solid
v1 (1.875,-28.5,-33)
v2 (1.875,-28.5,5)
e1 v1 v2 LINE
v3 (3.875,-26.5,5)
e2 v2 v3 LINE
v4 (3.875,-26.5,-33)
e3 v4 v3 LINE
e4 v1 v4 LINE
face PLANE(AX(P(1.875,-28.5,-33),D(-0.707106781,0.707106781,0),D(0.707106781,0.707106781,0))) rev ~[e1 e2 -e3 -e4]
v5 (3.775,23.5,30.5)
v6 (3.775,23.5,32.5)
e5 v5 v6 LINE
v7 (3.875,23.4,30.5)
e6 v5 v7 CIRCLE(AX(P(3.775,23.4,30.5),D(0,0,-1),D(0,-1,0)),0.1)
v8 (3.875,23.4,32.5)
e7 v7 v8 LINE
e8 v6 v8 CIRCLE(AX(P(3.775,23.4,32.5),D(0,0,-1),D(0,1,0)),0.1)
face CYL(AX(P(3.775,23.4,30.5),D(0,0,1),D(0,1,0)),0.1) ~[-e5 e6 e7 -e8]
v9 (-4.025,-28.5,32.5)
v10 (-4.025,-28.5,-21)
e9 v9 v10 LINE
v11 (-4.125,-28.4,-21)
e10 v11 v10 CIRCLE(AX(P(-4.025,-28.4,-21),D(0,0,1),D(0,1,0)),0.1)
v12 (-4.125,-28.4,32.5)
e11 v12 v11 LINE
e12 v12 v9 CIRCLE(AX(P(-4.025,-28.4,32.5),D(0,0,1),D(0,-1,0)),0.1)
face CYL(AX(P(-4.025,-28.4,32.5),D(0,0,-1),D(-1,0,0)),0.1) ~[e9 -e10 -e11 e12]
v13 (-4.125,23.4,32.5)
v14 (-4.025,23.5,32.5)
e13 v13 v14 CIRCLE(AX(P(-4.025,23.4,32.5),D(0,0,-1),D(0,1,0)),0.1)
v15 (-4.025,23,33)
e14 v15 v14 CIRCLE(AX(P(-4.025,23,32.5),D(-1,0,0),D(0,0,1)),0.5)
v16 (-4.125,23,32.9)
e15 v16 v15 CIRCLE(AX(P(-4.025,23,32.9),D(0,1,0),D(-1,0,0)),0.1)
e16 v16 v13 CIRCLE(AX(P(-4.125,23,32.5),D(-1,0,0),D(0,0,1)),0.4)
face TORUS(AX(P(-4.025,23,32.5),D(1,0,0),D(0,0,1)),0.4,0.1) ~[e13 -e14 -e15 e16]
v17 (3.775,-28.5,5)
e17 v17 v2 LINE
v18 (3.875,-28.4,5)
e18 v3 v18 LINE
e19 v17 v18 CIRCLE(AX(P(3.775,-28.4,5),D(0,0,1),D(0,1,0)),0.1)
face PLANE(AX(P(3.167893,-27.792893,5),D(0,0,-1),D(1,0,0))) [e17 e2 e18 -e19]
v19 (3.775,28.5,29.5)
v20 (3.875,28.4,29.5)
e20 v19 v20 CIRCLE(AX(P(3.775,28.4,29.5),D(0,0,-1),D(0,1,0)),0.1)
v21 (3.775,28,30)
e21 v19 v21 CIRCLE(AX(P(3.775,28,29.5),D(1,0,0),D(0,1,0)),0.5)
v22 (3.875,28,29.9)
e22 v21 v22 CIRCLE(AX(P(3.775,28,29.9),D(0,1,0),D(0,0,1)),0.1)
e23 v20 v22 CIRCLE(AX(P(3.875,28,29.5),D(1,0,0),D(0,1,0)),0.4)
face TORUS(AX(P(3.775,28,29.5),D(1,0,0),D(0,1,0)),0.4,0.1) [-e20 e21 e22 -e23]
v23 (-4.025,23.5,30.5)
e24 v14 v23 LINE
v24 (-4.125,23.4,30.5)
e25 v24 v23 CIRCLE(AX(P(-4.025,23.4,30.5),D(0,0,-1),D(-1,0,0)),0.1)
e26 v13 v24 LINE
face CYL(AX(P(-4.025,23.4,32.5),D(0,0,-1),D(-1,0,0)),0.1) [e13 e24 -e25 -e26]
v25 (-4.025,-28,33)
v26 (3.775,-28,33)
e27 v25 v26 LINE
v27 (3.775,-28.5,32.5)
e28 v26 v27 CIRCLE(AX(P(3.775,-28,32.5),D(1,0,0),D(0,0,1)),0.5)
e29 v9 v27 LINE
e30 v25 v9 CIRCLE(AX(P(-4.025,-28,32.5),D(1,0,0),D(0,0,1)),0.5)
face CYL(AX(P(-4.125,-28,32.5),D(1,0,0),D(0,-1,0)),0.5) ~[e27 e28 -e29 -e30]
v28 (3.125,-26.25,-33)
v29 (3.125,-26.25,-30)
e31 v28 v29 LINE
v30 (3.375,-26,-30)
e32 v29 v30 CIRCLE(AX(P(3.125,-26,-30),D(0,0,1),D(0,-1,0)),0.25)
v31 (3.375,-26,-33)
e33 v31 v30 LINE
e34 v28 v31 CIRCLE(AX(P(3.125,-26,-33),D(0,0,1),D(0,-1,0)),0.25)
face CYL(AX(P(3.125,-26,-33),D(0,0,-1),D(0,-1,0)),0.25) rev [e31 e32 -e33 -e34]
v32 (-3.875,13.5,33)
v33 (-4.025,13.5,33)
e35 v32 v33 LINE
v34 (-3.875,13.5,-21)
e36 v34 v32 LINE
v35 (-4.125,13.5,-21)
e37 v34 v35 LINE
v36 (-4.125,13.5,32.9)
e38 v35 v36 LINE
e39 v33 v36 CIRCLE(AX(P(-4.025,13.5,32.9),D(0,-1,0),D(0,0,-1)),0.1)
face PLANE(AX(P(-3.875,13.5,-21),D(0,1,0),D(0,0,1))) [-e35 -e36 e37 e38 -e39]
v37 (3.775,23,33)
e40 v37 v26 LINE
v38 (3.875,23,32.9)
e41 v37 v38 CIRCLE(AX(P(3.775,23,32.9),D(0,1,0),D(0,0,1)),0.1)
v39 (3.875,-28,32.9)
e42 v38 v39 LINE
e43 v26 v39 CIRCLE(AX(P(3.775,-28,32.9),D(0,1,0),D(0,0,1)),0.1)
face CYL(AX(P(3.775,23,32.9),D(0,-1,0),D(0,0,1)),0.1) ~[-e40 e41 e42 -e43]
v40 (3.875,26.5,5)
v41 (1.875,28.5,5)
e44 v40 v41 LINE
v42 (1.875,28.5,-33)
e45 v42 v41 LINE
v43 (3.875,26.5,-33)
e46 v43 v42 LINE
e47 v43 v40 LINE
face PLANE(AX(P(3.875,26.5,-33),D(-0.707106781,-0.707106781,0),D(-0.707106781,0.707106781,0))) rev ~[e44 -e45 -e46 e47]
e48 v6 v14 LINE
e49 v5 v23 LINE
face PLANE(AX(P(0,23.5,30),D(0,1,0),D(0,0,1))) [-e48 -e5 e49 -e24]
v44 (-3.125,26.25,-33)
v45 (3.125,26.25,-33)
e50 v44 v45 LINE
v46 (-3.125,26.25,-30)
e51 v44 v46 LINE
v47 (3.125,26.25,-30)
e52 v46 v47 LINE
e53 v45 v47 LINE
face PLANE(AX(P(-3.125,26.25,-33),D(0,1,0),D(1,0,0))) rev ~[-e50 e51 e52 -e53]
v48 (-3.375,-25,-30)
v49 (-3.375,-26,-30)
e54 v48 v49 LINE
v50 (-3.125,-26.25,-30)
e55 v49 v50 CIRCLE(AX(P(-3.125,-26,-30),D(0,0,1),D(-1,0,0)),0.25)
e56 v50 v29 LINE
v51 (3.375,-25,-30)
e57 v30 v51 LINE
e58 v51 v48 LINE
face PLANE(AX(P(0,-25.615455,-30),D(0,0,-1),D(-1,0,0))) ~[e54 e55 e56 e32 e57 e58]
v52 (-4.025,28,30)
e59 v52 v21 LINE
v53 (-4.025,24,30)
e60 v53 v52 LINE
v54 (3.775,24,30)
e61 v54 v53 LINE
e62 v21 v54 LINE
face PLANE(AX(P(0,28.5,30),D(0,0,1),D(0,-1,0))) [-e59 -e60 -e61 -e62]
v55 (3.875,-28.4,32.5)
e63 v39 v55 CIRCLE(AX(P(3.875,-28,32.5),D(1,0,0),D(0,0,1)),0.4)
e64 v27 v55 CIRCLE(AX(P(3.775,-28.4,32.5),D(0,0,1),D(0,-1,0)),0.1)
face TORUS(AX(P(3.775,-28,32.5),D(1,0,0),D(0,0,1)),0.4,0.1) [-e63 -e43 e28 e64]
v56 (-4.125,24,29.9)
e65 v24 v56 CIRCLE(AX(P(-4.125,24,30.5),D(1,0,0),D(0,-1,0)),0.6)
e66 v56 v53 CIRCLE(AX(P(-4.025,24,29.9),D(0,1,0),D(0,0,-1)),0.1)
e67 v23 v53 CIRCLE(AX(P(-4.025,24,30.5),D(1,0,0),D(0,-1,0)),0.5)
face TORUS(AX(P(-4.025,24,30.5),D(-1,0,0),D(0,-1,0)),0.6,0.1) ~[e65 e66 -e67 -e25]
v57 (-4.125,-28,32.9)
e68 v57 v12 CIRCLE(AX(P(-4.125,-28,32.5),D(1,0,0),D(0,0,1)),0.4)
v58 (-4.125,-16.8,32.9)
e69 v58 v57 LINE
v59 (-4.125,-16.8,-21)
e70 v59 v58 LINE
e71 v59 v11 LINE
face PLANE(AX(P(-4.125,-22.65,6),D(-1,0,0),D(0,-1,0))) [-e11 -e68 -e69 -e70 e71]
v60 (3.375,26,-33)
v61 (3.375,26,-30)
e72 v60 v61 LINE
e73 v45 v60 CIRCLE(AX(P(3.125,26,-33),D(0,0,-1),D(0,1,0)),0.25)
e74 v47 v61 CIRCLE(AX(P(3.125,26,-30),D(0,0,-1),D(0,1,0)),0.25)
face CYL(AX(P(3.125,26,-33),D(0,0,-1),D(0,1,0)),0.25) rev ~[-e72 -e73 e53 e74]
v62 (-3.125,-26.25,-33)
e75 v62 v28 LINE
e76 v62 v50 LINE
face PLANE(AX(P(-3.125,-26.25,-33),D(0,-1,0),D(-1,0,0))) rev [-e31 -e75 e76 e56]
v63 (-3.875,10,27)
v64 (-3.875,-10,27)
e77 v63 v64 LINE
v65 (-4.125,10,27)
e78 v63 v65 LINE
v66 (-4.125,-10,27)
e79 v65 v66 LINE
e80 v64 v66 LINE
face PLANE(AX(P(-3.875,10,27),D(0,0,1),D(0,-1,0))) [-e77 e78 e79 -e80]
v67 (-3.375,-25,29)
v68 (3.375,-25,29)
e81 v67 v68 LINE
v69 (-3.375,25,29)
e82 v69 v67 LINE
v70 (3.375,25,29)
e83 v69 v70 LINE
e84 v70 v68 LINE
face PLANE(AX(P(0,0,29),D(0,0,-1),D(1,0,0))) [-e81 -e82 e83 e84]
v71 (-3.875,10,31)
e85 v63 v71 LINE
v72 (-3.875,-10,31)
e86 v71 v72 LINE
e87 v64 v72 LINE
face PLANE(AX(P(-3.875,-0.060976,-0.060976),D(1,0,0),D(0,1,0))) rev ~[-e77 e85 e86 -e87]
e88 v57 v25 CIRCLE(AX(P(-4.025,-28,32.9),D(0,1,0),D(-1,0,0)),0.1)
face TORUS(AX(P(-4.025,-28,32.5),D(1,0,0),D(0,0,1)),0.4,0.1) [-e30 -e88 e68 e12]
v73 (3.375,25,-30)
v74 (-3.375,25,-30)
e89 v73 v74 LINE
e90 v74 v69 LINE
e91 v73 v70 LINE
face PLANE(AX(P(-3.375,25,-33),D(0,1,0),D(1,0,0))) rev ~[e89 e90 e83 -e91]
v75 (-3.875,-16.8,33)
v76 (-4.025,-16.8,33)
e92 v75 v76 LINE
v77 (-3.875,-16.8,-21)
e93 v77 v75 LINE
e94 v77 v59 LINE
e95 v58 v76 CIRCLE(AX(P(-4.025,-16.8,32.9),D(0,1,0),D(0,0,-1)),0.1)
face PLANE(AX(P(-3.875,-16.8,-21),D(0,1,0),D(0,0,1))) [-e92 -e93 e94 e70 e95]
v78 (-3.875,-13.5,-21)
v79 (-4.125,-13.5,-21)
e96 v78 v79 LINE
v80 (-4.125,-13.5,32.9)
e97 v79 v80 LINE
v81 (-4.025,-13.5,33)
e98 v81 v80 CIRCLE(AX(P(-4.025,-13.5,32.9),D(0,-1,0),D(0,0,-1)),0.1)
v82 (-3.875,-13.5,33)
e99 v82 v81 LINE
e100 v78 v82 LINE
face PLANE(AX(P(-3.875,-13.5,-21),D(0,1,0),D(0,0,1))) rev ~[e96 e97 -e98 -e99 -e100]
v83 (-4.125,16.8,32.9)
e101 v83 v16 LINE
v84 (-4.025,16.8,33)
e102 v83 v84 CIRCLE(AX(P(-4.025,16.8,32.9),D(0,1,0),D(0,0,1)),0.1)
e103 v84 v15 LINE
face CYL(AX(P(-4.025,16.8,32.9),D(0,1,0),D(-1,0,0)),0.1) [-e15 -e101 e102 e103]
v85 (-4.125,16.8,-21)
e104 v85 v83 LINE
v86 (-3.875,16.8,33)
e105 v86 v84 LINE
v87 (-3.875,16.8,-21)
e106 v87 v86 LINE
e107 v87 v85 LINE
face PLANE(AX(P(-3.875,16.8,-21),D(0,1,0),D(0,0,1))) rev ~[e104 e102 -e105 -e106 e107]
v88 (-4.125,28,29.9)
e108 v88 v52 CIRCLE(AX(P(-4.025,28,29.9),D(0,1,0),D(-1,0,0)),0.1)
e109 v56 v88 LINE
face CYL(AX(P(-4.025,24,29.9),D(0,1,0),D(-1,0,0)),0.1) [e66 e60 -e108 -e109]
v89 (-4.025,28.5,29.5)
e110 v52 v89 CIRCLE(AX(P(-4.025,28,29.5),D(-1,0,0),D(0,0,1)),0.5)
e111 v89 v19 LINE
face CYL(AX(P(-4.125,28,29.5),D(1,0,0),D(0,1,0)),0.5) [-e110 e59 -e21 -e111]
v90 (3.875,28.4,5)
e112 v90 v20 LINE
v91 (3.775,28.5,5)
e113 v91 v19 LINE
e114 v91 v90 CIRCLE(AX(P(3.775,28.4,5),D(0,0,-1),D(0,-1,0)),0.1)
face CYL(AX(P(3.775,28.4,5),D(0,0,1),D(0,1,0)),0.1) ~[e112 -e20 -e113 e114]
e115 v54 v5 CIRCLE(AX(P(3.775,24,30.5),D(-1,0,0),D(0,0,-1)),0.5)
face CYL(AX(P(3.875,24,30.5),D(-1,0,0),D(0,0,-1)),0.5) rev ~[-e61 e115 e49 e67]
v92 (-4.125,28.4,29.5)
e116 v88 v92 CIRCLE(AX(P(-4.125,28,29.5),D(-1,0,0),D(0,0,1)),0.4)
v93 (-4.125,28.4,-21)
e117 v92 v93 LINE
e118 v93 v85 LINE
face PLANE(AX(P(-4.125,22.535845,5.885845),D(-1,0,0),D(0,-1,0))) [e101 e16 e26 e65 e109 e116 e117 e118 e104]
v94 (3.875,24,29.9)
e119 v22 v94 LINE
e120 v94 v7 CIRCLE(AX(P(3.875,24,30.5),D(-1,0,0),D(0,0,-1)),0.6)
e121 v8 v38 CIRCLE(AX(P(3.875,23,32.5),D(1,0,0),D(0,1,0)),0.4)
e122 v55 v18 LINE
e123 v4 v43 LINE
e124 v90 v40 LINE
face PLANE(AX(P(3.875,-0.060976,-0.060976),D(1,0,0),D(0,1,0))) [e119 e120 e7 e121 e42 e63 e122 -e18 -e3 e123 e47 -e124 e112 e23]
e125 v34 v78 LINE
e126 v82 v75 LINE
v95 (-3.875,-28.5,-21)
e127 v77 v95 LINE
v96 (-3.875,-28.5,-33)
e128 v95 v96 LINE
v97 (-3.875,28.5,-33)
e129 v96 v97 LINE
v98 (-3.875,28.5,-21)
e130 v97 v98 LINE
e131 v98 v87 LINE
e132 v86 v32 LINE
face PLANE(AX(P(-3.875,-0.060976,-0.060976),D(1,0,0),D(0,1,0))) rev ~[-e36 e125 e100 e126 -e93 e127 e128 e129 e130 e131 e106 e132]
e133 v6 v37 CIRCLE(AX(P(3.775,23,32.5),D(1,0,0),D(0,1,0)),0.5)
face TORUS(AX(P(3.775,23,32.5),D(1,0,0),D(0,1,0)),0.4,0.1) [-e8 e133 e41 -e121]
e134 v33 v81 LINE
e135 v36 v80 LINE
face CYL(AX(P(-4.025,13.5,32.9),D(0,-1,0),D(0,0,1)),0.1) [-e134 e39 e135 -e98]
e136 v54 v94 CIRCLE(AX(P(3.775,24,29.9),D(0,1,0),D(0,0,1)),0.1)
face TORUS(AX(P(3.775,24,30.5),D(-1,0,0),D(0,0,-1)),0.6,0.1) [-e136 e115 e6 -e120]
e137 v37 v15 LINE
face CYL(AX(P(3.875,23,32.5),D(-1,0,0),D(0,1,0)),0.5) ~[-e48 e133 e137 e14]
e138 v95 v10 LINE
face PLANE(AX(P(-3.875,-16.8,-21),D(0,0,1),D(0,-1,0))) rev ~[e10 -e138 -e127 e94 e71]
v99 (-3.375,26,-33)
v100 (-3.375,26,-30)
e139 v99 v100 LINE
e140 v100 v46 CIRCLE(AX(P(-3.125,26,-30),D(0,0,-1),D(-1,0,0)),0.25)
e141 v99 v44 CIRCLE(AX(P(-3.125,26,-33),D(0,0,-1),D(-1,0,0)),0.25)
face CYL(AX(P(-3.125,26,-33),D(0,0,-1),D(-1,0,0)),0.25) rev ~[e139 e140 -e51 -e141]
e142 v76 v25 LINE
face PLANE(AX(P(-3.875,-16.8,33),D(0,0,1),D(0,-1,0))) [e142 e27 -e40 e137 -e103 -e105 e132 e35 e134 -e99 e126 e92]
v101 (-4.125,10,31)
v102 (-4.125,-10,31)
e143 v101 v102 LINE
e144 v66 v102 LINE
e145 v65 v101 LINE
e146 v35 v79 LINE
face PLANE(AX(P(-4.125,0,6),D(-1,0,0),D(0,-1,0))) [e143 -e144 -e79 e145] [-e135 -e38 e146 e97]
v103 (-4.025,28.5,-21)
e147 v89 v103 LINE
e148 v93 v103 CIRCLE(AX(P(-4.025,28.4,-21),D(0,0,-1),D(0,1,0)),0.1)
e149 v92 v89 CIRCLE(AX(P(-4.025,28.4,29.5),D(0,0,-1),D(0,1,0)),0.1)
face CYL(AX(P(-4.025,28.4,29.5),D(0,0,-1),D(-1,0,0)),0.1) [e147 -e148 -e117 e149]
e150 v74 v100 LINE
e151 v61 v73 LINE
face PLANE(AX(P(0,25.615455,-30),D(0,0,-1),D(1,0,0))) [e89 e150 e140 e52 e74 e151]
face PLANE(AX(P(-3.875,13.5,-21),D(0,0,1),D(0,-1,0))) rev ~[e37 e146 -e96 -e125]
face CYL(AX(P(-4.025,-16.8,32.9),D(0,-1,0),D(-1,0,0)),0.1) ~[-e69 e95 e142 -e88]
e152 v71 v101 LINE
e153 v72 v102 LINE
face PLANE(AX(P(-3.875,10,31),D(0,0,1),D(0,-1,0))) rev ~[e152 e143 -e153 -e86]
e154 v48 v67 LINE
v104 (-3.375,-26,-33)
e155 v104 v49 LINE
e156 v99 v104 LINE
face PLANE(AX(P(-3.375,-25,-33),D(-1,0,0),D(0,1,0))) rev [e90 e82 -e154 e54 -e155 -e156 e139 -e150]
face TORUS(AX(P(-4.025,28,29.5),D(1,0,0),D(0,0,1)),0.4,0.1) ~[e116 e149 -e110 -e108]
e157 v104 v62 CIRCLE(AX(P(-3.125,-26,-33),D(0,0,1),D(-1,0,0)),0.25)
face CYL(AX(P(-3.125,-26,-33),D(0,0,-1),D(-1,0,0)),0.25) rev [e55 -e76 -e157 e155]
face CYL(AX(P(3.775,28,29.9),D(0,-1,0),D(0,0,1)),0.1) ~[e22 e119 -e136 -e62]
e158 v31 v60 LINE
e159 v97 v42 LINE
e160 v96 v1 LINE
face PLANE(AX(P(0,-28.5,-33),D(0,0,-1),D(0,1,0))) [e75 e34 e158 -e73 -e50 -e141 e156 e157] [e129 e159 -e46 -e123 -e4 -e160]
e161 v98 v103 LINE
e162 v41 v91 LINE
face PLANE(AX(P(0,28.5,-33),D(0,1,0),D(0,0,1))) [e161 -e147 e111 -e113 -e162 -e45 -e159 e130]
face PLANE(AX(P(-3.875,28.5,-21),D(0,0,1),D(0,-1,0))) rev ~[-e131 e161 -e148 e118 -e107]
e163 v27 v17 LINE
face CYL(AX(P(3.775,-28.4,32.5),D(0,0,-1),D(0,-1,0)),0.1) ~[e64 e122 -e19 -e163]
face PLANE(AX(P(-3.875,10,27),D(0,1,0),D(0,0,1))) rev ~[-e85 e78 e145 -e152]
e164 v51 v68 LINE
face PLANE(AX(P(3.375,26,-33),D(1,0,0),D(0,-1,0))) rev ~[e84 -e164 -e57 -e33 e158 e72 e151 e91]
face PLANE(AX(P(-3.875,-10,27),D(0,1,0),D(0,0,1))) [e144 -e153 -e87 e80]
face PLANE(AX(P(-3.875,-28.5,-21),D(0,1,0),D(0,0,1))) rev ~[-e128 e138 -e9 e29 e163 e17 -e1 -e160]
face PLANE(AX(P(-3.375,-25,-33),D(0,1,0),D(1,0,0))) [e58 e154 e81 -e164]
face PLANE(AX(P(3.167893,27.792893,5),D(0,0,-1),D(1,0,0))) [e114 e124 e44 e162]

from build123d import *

# Parameters (mm, degrees)
F1_DEPTH  = 3.875
F3_DEPTH  = 38
F4_W      = 27
F4_H      = 54
F4_W_2    = 20
F4_H_2    = 4
F4_W_3    = 11.7
F5_DEPTH  = 0.25
F8_R      = 0.5
F9_R      = 0.1
F11_W     = 6.75
F11_H     = 50
F12_DEPTH = 62
F14_DEPTH = 3


# Not quite as in the source:
# - a pattern or mirror of a feature is missing from the dataset's text; its kind, count and spacing are read off the source's solid


with BuildPart() as f1:
    # F0 (on Right) → F1 (new body, symmetric)
    with BuildSketch(Plane.YZ):
        Polygon((23.5, 33), (-28.5, 33), (-28.5, -33), (28.5, -33), (28.5, 30), (23.5, 30), align=None)
    extrude(amount=F1_DEPTH, both=True)

    # F2 (on face) → F3 (cut)
    with BuildSketch(Plane(origin=(0, 0, -33), x_dir=(1, 0, 0), z_dir=(0, 0, -1))):
        Polygon((3.875, 28.5), (1.875, 28.5), (3.875, 26.5), align=None)
        Polygon((3.875, -26.5), (1.875, -28.5), (3.875, -28.5), align=None)
    extrude(amount=-F3_DEPTH, mode=Mode.SUBTRACT)

    # F4 (on face) → F5 (join)
    with BuildSketch(Plane(origin=(-3.875, 0, 0), x_dir=(0, -1, 0), z_dir=(-1, 0, 0))):
        with Locations((0, 6)):
            Rectangle(F4_W, F4_H)
        with Locations((0, 29)):
            Rectangle(F4_W_2, F4_H_2, mode=Mode.SUBTRACT)
        with Locations((22.65, 6)):
            Rectangle(F4_W_3, F4_H)
        Polygon((-28.5, 30), (-28.5, -21), (-16.8, -21), (-16.8, 33), (-23.5, 33), (-23.5, 30), align=None)
    extrude(amount=F5_DEPTH)

    # F8
    f8_edges = [f1.edges().sort_by_distance(p)[0] for p in [
        (-0.125, 23.5, 33),
        (-0.125, 23.5, 30),
        (-0.125, 28.5, 30),
        (-0.125, -28.5, 33),
    ]]
    fillet(f8_edges, radius=F8_R)

    # F9
    f9_edges = [f1.edges().sort_by_distance(p)[0] for p in [
        (3.875, -2.5, 33),
        (3.875, 26, 30),
        (-4.125, 26, 30),
        (-4.125, 23.5, 31.5),
        (3.875, 23.5, 31.5),
        (-4.125, 19.9, 33),
        (-4.125, 0, 33),
        (-4.125, -22.4, 33),
        (-4.125, -28.5, 5.75),
        (3.875, -28.5, 18.75),
        (-4.125, 28.5, 4.25),
        (-4.125, -28.353553, 32.853553),
        (3.875, -28.353553, 32.853553),
        (3.875, 23.646447, 30.146447),
        (3.875, 23.353553, 32.853553),
        (3.875, 28.353553, 29.853553),
        (3.875, 28.5, 17.25),
        (-4.125, 23.353553, 32.853553),
        (-4.125, 28.353553, 29.853553),
        (-4.125, 23.646447, 30.146447),
    ]]
    fillet(f9_edges, radius=F9_R)

    # F11 (on face) → F12 (cut)
    with BuildSketch(Plane(origin=(0, 0, -33), x_dir=(1, 0, 0), z_dir=(0, 0, -1))):
        Rectangle(F11_W, F11_H)
    extrude(amount=-F12_DEPTH, mode=Mode.SUBTRACT)

    # F13 (on face) → F14 (cut)
    with BuildSketch(Plane(origin=(0, 0, -33), x_dir=(1, 0, 0), z_dir=(0, 0, -1))):
        with BuildLine():
            Line((3.375, -25), (-3.375, -25))
            Line((-3.375, -25), (-3.375, -26))
            ThreePointArc((-3.375, -26), (-3.3017766953, -26.1767766953), (-3.125, -26.25))
            Line((-3.125, -26.25), (3.125, -26.25))
            ThreePointArc((3.125, -26.25), (3.3017766953, -26.1767766953), (3.375, -26))
            Line((3.375, -26), (3.375, -25))
        make_face()
    f14 = extrude(amount=-F14_DEPTH, mode=Mode.SUBTRACT)

    # F14_copies: F14 across plane
    add(f14.mirror(Plane(origin=(0, 0, 0), x_dir=(0, 0, -1), z_dir=(0, -1, 0))), mode=Mode.SUBTRACT)


solid = f1.part
